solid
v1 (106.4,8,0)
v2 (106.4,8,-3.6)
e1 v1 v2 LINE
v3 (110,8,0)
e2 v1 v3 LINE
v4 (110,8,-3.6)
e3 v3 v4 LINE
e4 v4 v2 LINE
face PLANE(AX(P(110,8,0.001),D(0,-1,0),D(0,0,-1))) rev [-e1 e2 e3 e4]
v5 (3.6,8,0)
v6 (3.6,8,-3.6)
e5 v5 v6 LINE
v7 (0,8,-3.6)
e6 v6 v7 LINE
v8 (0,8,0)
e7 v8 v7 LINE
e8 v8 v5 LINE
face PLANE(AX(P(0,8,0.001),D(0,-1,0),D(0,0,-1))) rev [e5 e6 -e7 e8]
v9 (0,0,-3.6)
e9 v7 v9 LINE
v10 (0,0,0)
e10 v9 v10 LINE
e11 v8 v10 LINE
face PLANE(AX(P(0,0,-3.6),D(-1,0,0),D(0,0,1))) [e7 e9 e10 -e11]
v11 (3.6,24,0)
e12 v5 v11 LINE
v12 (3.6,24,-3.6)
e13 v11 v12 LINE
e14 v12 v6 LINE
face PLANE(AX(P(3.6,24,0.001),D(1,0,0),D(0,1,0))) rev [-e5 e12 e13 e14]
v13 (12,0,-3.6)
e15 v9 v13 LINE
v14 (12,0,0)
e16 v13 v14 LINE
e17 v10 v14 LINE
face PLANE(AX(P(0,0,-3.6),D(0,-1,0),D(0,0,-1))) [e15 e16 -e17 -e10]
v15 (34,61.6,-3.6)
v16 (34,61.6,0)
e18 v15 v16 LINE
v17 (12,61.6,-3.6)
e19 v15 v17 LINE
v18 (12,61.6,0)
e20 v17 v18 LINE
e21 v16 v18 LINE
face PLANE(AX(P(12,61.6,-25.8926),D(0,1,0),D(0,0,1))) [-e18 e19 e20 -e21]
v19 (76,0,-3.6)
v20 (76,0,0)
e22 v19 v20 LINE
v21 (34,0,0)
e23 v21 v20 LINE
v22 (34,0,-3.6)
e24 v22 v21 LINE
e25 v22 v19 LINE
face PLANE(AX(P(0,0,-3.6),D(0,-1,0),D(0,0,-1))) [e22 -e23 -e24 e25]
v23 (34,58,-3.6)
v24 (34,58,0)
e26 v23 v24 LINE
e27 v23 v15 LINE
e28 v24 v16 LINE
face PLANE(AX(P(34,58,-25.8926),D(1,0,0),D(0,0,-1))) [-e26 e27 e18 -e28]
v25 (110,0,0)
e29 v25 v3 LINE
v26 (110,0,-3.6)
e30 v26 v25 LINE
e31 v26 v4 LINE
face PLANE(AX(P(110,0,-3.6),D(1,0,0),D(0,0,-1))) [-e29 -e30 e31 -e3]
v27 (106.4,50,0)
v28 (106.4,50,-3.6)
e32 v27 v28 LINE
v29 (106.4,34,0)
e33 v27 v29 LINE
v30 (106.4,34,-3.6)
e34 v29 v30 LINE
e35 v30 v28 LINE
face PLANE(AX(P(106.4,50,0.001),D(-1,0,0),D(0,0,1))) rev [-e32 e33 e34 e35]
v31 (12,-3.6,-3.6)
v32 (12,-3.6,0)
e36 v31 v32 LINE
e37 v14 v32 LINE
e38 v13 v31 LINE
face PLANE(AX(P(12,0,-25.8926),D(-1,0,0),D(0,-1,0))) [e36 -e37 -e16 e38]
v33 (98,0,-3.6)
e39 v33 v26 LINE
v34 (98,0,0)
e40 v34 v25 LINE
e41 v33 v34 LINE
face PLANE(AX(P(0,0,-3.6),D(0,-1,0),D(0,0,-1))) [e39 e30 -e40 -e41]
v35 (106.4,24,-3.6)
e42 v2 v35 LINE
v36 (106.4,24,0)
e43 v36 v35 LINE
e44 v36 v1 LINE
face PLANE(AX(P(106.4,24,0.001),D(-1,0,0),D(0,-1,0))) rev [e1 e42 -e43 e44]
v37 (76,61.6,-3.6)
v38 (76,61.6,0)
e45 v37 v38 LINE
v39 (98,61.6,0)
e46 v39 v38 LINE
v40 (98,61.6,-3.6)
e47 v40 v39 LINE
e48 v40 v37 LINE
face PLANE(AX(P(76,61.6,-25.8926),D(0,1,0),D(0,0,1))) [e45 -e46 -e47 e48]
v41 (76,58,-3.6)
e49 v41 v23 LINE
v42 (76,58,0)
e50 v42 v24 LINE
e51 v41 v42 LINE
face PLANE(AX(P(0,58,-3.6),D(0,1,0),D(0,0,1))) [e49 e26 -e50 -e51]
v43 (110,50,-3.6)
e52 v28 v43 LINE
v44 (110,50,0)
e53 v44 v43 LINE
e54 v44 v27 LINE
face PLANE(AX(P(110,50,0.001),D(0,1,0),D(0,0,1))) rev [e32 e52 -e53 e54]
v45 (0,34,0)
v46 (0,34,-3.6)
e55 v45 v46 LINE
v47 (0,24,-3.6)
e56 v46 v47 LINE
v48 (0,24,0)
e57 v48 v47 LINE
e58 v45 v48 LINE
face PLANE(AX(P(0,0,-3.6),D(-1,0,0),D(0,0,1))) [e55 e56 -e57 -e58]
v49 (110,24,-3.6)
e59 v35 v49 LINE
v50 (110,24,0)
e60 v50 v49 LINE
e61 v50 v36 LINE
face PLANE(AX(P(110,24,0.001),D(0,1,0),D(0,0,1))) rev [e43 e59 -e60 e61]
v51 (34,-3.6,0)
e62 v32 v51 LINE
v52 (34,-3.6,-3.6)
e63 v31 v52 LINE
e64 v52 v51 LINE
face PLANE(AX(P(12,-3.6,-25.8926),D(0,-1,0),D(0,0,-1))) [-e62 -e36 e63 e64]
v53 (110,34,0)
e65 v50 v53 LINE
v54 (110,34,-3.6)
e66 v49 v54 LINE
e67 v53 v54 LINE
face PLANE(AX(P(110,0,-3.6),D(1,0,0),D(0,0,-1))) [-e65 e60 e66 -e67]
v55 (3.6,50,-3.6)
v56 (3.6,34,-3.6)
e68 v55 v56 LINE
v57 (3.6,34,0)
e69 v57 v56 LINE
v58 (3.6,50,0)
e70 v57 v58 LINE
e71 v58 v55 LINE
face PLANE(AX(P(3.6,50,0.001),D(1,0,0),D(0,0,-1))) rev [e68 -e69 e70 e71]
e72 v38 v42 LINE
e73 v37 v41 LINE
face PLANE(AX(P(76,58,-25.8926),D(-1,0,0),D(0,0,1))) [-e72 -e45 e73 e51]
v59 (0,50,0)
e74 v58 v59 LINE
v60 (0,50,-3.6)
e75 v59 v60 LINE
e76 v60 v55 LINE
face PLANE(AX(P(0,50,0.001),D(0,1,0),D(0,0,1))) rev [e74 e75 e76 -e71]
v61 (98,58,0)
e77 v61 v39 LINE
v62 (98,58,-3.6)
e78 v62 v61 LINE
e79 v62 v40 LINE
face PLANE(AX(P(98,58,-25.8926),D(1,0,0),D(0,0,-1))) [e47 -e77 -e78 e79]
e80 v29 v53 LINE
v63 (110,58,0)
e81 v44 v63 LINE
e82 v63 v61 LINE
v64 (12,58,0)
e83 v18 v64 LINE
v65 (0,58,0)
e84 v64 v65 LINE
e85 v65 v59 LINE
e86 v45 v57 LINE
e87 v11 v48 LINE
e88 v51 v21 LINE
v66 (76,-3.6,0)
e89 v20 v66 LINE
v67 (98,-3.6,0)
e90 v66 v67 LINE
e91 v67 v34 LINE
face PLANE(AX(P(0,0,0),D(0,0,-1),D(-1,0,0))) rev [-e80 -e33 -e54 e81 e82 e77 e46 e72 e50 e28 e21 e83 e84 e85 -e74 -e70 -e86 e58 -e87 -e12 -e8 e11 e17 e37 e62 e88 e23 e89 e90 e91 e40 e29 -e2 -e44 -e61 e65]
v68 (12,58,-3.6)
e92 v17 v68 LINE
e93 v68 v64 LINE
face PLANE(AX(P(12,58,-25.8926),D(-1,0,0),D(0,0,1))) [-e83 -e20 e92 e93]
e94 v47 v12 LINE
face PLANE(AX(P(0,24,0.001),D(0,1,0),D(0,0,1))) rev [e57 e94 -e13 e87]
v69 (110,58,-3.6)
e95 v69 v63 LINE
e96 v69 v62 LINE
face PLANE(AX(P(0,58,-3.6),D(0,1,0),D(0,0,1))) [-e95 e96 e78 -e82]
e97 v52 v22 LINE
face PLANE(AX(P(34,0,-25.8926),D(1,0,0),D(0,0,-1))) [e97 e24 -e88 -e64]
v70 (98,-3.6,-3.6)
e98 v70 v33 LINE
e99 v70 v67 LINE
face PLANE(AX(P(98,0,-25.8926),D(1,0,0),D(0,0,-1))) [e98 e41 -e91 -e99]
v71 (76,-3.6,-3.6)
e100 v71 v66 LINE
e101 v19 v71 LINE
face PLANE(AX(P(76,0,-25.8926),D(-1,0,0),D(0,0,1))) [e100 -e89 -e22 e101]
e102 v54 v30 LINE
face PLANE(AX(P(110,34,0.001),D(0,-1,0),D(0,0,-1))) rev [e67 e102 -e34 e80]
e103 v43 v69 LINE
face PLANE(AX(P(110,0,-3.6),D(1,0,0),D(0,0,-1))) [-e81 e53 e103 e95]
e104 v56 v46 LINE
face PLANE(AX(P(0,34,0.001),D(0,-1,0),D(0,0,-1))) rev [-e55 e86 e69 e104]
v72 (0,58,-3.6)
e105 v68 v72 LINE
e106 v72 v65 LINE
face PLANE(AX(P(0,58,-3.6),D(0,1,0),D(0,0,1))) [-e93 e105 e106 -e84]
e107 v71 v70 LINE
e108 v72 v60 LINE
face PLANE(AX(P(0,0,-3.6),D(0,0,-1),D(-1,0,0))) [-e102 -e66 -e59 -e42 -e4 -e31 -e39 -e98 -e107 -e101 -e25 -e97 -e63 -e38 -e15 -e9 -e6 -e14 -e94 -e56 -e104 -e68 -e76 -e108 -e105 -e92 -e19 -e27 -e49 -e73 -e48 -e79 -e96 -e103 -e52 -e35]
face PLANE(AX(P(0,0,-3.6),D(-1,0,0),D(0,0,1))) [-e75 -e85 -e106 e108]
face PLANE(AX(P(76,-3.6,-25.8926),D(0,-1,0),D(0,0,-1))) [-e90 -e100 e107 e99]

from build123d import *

# Parameters (mm, degrees)
SKETCH_1_W             = 110
SKETCH_1_H             = 58
SM_BASE_FLANGE_1_DEPTH = 3.6
CUT_EXTRUDE_1_REACH    = 126.406
SKETCH_2_W             = 3.6
SKETCH_2_H             = 16
SKETCH_3_W             = 22
SKETCH_3_H             = 3.6
EXTRUDE_1_DEPTH        = 3.6


# Sheet-metal steps are written as plain solids
with BuildPart() as part:
    # Sketch 1 → Базовая кромка1 (new body)
    with BuildSketch(Plane.XY):
        with Locations((55, 29)):
            Rectangle(SKETCH_1_W, SKETCH_1_H)
    extrude(amount=-SM_BASE_FLANGE_1_DEPTH)

    # Sketch 2 → Вырез-Вытянуть1 (cut, up to next)
    with BuildSketch(Plane(origin=(0, 0, -3.6), x_dir=(-1, 0, 0), z_dir=(0, 0, -1)), mode=Mode.PRIVATE) as cut_extrude_1_sk1:
        with Locations((-108.2, 42)):
            Rectangle(SKETCH_2_W, SKETCH_2_H)
    cut_extrude_1_tool1 = extrude(cut_extrude_1_sk1.sketch, amount=-CUT_EXTRUDE_1_REACH, mode=Mode.PRIVATE) & part.part
    # Sketch 2 → Вырез-Вытянуть1 (cut, up to next)
    with BuildSketch(Plane(origin=(0, 0, -3.6), x_dir=(-1, 0, 0), z_dir=(0, 0, -1)), mode=Mode.PRIVATE) as cut_extrude_1_sk2:
        with Locations((-108.2, 16)):
            Rectangle(SKETCH_2_W, SKETCH_2_H)
    cut_extrude_1_tool2 = extrude(cut_extrude_1_sk2.sketch, amount=-CUT_EXTRUDE_1_REACH, mode=Mode.PRIVATE) & part.part
    # Sketch 2 → Вырез-Вытянуть1 (cut, up to next)
    with BuildSketch(Plane(origin=(0, 0, -3.6), x_dir=(-1, 0, 0), z_dir=(0, 0, -1)), mode=Mode.PRIVATE) as cut_extrude_1_sk3:
        with Locations((-1.8, 16)):
            Rectangle(SKETCH_2_W, SKETCH_2_H)
    cut_extrude_1_tool3 = extrude(cut_extrude_1_sk3.sketch, amount=-CUT_EXTRUDE_1_REACH, mode=Mode.PRIVATE) & part.part
    # Sketch 2 → Вырез-Вытянуть1 (cut, up to next)
    with BuildSketch(Plane(origin=(0, 0, -3.6), x_dir=(-1, 0, 0), z_dir=(0, 0, -1)), mode=Mode.PRIVATE) as cut_extrude_1_sk4:
        with Locations((-1.8, 42)):
            Rectangle(SKETCH_2_W, SKETCH_2_H)
    cut_extrude_1_tool4 = extrude(cut_extrude_1_sk4.sketch, amount=-CUT_EXTRUDE_1_REACH, mode=Mode.PRIVATE) & part.part
    add(cut_extrude_1_tool1.solids().sort_by_distance((108.2, 42, -3.6))[0], mode=Mode.SUBTRACT)
    add(cut_extrude_1_tool2.solids().sort_by_distance((108.2, 16, -3.6))[0], mode=Mode.SUBTRACT)
    add(cut_extrude_1_tool3.solids().sort_by_distance((1.8, 16, -3.6))[0], mode=Mode.SUBTRACT)
    add(cut_extrude_1_tool4.solids().sort_by_distance((1.8, 42, -3.6))[0], mode=Mode.SUBTRACT)

    # Эскиз3 → Бобышка-Вытянуть1 (add)
    with BuildSketch(Plane.XY):
        with Locations((23, 59.8)):
            Rectangle(SKETCH_3_W, SKETCH_3_H)
        with Locations((87, 59.8)):
            Rectangle(SKETCH_3_W, SKETCH_3_H)
        with Locations((23, -1.8)):
            Rectangle(SKETCH_3_W, SKETCH_3_H)
        with Locations((87, -1.8)):
            Rectangle(SKETCH_3_W, SKETCH_3_H)
    extrude(amount=-EXTRUDE_1_DEPTH)


solid = part.part
